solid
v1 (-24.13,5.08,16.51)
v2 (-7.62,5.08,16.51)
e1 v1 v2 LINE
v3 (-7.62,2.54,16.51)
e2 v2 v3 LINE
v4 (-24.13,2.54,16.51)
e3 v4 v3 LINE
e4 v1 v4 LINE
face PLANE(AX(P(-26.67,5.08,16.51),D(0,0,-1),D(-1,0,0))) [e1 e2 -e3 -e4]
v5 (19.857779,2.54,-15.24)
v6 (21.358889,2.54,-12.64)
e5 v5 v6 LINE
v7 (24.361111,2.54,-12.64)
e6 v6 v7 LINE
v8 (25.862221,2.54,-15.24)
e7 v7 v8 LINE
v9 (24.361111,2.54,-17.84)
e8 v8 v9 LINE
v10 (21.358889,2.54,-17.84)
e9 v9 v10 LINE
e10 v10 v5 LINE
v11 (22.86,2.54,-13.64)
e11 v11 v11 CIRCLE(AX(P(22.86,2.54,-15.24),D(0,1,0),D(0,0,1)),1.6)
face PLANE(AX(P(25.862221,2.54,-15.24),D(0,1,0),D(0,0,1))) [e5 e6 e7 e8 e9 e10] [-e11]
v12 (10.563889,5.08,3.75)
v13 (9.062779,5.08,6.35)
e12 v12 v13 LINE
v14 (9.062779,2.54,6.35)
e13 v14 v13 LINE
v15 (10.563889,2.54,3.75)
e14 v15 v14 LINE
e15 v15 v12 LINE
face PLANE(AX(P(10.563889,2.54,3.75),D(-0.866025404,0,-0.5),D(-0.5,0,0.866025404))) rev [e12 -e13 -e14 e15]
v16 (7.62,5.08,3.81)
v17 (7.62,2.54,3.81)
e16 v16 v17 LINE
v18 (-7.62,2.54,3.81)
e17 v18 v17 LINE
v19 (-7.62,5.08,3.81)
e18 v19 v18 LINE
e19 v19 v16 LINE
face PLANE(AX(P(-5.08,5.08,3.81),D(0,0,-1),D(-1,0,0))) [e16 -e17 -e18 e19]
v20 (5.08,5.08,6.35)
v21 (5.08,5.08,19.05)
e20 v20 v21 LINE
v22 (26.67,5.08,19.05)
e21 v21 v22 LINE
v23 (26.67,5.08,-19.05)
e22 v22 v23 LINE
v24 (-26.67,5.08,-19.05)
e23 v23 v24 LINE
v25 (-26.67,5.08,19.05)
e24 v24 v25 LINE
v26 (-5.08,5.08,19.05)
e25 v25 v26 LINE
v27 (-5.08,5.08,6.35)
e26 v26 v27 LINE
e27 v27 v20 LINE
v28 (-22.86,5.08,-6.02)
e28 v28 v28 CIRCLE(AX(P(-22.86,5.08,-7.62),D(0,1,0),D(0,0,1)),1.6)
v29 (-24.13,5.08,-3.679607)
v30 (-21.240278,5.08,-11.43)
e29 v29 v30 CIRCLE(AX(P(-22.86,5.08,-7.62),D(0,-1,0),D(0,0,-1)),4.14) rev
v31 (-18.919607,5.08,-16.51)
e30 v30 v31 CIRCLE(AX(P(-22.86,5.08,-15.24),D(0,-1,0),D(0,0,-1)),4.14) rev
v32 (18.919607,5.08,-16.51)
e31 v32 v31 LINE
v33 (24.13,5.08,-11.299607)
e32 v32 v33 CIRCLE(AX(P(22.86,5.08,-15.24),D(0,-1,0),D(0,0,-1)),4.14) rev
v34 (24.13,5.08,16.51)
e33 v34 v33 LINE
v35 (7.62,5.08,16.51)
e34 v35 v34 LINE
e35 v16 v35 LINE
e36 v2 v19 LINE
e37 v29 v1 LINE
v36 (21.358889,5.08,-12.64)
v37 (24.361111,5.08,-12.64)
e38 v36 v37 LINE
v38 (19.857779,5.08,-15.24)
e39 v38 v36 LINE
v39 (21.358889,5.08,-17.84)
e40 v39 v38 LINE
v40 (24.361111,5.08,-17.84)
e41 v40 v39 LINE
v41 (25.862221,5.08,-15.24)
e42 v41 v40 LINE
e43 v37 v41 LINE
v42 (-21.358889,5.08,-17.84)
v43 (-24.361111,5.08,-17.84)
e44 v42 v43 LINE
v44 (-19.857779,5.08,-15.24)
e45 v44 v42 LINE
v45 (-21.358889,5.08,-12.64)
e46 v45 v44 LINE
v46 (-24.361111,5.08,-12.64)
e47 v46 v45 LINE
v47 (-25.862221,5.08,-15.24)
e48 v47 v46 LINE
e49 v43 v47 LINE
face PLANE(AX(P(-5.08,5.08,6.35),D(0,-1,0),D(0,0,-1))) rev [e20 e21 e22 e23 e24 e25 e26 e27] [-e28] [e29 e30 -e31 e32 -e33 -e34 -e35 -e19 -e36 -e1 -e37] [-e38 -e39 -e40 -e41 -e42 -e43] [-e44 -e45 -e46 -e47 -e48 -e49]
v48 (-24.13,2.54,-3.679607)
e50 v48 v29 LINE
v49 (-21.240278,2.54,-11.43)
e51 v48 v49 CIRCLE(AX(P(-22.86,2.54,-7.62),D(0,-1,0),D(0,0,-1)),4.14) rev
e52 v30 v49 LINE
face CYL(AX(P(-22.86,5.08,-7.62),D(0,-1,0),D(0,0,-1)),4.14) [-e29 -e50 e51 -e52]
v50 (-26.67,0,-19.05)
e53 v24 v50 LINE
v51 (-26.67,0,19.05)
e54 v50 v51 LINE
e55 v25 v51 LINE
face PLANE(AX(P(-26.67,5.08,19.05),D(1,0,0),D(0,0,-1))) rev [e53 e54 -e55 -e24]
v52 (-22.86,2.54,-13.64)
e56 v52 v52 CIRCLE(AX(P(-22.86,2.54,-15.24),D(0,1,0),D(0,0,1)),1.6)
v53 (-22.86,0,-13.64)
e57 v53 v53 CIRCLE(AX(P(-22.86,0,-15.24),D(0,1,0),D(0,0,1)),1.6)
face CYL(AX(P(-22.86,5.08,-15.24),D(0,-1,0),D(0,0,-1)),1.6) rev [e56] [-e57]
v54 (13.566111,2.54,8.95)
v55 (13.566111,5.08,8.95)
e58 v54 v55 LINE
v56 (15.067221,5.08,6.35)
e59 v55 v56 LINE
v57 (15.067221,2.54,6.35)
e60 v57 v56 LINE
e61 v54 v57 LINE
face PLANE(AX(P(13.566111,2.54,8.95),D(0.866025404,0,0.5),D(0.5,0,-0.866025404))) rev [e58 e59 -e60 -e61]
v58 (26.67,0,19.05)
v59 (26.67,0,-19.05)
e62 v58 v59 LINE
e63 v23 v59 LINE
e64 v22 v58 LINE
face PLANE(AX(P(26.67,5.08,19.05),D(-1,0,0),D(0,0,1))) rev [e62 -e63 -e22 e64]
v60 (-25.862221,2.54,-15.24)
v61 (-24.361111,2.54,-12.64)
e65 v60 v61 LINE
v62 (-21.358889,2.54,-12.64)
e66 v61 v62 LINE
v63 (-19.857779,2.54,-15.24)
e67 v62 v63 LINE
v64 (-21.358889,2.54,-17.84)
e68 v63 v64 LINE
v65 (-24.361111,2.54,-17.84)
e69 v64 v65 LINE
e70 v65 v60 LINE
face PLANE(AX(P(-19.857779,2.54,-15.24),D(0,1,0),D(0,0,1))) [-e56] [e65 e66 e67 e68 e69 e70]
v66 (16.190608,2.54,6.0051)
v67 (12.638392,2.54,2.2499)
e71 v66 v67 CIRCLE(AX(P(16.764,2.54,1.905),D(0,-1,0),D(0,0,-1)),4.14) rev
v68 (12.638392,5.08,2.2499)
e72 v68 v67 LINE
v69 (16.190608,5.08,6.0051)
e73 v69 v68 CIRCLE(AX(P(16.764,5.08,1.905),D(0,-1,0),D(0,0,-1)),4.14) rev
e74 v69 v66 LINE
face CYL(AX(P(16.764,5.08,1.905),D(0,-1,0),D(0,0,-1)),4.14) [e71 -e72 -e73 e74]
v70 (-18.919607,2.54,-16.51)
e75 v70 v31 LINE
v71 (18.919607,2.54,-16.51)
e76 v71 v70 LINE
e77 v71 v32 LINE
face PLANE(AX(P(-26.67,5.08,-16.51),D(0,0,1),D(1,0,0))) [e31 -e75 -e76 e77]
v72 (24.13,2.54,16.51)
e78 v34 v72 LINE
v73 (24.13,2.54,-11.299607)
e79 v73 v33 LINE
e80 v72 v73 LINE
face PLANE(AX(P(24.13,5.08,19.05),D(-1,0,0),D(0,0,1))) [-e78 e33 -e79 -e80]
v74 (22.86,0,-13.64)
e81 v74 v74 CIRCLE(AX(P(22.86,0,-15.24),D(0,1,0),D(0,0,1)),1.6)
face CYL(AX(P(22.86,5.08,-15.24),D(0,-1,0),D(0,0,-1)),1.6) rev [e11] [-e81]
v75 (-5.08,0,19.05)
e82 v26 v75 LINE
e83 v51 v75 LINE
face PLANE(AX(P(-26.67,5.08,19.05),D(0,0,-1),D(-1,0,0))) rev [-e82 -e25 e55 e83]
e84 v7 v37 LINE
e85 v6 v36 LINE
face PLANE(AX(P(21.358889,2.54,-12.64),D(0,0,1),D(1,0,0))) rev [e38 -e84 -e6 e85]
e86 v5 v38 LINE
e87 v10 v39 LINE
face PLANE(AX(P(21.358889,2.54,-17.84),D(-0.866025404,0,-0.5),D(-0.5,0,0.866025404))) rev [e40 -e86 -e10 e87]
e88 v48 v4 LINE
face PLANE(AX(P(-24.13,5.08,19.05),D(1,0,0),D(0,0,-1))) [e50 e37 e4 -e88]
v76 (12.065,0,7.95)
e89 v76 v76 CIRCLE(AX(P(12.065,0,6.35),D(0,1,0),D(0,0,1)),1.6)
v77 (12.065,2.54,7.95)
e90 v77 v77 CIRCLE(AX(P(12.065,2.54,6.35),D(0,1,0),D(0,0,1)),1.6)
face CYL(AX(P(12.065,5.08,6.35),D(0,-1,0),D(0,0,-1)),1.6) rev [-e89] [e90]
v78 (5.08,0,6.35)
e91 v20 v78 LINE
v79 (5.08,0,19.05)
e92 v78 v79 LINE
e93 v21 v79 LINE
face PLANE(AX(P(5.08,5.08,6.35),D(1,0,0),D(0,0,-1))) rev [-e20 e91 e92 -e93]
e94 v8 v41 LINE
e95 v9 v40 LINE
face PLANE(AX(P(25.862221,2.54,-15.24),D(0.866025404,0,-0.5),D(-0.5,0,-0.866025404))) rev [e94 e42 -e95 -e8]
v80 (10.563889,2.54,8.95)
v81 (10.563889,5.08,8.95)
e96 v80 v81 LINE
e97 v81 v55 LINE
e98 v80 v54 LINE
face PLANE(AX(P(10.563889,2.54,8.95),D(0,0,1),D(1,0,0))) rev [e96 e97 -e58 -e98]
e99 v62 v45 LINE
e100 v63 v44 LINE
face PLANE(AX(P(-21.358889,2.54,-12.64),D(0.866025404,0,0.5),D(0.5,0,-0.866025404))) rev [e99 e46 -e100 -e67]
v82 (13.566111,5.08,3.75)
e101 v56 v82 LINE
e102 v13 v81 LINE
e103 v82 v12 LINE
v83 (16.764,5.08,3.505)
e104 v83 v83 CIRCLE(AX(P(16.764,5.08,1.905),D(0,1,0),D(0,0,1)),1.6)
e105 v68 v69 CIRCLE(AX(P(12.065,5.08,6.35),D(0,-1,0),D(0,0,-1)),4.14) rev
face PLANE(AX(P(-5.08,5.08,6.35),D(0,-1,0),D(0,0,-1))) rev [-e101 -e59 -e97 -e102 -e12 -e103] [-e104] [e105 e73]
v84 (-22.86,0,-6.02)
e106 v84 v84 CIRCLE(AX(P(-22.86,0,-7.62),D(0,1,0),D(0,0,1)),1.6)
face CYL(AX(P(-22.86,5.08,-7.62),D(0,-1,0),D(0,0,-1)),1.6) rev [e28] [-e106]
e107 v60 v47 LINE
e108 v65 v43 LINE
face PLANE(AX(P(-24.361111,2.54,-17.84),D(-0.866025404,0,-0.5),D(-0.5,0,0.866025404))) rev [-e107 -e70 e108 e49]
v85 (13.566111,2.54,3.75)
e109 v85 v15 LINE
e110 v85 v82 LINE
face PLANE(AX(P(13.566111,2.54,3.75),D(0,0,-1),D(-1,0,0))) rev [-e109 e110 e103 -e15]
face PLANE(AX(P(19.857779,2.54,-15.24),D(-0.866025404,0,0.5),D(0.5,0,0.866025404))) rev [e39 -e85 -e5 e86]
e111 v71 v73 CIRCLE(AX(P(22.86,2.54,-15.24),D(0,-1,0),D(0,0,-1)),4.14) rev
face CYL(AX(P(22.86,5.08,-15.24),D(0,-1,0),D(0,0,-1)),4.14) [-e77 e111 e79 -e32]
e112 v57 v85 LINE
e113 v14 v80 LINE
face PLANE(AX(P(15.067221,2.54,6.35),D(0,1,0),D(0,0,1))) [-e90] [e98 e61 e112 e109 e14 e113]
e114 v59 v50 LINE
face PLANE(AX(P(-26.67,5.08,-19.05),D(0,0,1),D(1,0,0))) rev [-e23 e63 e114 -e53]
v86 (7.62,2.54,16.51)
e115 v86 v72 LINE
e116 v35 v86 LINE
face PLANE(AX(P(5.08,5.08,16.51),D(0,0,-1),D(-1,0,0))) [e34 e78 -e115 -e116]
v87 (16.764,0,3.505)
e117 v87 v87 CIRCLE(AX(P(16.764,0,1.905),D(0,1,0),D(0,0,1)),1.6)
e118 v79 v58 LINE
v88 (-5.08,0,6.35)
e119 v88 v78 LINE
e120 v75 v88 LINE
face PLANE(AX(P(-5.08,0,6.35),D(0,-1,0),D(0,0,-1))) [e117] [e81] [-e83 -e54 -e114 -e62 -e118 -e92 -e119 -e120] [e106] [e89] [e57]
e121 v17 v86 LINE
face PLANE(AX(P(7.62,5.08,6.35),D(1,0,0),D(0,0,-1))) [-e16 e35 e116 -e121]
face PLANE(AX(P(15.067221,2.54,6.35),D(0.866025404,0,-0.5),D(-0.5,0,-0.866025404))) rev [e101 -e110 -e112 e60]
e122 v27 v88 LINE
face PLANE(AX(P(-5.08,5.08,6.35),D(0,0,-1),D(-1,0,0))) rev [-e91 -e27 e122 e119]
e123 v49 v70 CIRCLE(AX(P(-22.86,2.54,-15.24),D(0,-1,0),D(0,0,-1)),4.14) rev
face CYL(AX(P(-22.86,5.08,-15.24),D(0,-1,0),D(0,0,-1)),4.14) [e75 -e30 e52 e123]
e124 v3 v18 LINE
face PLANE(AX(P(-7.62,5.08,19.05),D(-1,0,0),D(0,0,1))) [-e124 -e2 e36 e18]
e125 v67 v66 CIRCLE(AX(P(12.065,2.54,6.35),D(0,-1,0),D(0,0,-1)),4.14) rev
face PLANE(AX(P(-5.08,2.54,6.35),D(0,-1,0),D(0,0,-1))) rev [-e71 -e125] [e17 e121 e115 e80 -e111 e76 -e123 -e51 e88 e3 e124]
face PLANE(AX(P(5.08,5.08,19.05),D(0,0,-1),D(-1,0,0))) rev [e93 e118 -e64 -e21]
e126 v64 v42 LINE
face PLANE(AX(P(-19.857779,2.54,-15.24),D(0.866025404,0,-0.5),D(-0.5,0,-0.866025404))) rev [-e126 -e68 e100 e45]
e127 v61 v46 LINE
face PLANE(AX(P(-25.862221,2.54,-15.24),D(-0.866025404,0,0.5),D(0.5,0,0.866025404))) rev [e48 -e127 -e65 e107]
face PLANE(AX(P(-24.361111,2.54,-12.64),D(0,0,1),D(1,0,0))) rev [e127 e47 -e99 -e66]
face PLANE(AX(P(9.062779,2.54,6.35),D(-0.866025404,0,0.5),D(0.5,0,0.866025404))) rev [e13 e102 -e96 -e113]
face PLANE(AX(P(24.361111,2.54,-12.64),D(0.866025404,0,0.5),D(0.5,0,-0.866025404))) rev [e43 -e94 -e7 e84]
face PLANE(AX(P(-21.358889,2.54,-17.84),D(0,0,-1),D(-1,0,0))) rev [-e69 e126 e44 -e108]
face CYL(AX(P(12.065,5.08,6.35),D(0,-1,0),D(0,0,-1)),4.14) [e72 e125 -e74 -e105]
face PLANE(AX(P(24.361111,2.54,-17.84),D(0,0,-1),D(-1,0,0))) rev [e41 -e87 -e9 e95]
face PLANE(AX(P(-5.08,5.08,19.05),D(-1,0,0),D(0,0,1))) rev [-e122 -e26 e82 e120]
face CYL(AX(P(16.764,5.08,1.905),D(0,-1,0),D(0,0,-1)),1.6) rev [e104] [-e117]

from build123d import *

# Parameters (mm, degrees)
SKETCH1_R           = 1.6
BOSS_EXTRUDE1_DEPTH = 5.08
SHELL1_START        = 2.54
SHELL1_DEPTH        = 2.54
CUT_EXTRUDE1_DEPTH  = 2.54


# Read off the part's stored shape, not the designer's step: Shell1
with BuildPart() as part:
    # Sketch1 → Boss-Extrude1 (new body)
    with BuildSketch(Plane(origin=(0, 0, 0), x_dir=(1, 0, 0), z_dir=(0, 1, 0))):
        Polygon((-5.08, -6.35), (5.08, -6.35), (5.08, -19.05), (26.67, -19.05), (26.67, 19.05), (-26.67, 19.05), (-26.67, -19.05), (-5.08, -19.05), align=None)
        with Locations(Location((12.065, -6.35, 0), (0, 0, 270))):
            Circle(SKETCH1_R, mode=Mode.SUBTRACT)
        with Locations(Location((-22.86, 15.24, 0), (0, 0, 270))):
            Circle(SKETCH1_R, mode=Mode.SUBTRACT)
        with Locations(Location((16.764, -1.905, 0), (0, 0, 270))):
            Circle(SKETCH1_R, mode=Mode.SUBTRACT)
        with Locations(Location((-22.86, 7.62, 0), (0, 0, 270))):
            Circle(SKETCH1_R, mode=Mode.SUBTRACT)
        with Locations(Location((22.86, 15.24, 0), (0, 0, 270))):
            Circle(SKETCH1_R, mode=Mode.SUBTRACT)
    extrude(amount=BOSS_EXTRUDE1_DEPTH)

    # Shell1 outline → Shell1 (cut)
    with BuildSketch(Plane(origin=(0, 0, 0), x_dir=(1, 0, 0), z_dir=(0, 1, 0)).offset(SHELL1_START)):
        with BuildLine():
            Line((-7.62, -16.51), (-7.62, -3.81))
            Line((-7.62, -3.81), (7.62, -3.81))
            Line((7.62, -3.81), (7.62, -16.51))
            Line((7.62, -16.51), (24.13, -16.51))
            Line((24.13, -16.51), (24.13, 11.299606619))
            ThreePointArc((24.13, 11.299606619), (19.932577926, 12.312577926), (18.919606619, 16.51))
            Line((18.919606619, 16.51), (-18.919606619, 16.51))
            ThreePointArc((-18.919606619, 16.51), (-19.094323259, 13.519744587), (-21.240277802, 11.43))
            ThreePointArc((-21.240277802, 11.43), (-18.980860173, 6.173668709), (-24.13, 3.679606619))
            Line((-24.13, 3.679606619), (-24.13, -16.51))
            Line((-24.13, -16.51), (-7.62, -16.51))
        make_face()
        with BuildLine():
            ThreePointArc((12.638391662, -2.249899757), (19.771579246, 0.940007395), (16.190608338, -6.005100243))
            ThreePointArc((16.190608338, -6.005100243), (9.057420754, -9.195007395), (12.638391662, -2.249899757))
        make_face(mode=Mode.SUBTRACT)
    extrude(amount=SHELL1_DEPTH, mode=Mode.SUBTRACT)

    # Sketch8 → Cut-Extrude1 (cut)
    with BuildSketch(Plane(origin=(0, 5.08, 0), x_dir=(1, 0, 0), z_dir=(0, 1, 0))):
        Polygon((-19.8577786, 15.24), (-21.3588893, 17.84), (-24.3611107, 17.84), (-25.8622214, 15.24), (-24.3611107, 12.64), (-21.3588893, 12.64), align=None)
        Polygon((25.8622214, 15.24), (24.3611107, 17.84), (21.3588893, 17.84), (19.8577786, 15.24), (21.3588893, 12.64), (24.3611107, 12.64), align=None)
        Polygon((15.0672214, -6.35), (13.5661107, -3.75), (10.5638893, -3.75), (9.0627786, -6.35), (10.5638893, -8.95), (13.5661107, -8.95), align=None)
    extrude(amount=-CUT_EXTRUDE1_DEPTH, mode=Mode.SUBTRACT)


solid = part.part
